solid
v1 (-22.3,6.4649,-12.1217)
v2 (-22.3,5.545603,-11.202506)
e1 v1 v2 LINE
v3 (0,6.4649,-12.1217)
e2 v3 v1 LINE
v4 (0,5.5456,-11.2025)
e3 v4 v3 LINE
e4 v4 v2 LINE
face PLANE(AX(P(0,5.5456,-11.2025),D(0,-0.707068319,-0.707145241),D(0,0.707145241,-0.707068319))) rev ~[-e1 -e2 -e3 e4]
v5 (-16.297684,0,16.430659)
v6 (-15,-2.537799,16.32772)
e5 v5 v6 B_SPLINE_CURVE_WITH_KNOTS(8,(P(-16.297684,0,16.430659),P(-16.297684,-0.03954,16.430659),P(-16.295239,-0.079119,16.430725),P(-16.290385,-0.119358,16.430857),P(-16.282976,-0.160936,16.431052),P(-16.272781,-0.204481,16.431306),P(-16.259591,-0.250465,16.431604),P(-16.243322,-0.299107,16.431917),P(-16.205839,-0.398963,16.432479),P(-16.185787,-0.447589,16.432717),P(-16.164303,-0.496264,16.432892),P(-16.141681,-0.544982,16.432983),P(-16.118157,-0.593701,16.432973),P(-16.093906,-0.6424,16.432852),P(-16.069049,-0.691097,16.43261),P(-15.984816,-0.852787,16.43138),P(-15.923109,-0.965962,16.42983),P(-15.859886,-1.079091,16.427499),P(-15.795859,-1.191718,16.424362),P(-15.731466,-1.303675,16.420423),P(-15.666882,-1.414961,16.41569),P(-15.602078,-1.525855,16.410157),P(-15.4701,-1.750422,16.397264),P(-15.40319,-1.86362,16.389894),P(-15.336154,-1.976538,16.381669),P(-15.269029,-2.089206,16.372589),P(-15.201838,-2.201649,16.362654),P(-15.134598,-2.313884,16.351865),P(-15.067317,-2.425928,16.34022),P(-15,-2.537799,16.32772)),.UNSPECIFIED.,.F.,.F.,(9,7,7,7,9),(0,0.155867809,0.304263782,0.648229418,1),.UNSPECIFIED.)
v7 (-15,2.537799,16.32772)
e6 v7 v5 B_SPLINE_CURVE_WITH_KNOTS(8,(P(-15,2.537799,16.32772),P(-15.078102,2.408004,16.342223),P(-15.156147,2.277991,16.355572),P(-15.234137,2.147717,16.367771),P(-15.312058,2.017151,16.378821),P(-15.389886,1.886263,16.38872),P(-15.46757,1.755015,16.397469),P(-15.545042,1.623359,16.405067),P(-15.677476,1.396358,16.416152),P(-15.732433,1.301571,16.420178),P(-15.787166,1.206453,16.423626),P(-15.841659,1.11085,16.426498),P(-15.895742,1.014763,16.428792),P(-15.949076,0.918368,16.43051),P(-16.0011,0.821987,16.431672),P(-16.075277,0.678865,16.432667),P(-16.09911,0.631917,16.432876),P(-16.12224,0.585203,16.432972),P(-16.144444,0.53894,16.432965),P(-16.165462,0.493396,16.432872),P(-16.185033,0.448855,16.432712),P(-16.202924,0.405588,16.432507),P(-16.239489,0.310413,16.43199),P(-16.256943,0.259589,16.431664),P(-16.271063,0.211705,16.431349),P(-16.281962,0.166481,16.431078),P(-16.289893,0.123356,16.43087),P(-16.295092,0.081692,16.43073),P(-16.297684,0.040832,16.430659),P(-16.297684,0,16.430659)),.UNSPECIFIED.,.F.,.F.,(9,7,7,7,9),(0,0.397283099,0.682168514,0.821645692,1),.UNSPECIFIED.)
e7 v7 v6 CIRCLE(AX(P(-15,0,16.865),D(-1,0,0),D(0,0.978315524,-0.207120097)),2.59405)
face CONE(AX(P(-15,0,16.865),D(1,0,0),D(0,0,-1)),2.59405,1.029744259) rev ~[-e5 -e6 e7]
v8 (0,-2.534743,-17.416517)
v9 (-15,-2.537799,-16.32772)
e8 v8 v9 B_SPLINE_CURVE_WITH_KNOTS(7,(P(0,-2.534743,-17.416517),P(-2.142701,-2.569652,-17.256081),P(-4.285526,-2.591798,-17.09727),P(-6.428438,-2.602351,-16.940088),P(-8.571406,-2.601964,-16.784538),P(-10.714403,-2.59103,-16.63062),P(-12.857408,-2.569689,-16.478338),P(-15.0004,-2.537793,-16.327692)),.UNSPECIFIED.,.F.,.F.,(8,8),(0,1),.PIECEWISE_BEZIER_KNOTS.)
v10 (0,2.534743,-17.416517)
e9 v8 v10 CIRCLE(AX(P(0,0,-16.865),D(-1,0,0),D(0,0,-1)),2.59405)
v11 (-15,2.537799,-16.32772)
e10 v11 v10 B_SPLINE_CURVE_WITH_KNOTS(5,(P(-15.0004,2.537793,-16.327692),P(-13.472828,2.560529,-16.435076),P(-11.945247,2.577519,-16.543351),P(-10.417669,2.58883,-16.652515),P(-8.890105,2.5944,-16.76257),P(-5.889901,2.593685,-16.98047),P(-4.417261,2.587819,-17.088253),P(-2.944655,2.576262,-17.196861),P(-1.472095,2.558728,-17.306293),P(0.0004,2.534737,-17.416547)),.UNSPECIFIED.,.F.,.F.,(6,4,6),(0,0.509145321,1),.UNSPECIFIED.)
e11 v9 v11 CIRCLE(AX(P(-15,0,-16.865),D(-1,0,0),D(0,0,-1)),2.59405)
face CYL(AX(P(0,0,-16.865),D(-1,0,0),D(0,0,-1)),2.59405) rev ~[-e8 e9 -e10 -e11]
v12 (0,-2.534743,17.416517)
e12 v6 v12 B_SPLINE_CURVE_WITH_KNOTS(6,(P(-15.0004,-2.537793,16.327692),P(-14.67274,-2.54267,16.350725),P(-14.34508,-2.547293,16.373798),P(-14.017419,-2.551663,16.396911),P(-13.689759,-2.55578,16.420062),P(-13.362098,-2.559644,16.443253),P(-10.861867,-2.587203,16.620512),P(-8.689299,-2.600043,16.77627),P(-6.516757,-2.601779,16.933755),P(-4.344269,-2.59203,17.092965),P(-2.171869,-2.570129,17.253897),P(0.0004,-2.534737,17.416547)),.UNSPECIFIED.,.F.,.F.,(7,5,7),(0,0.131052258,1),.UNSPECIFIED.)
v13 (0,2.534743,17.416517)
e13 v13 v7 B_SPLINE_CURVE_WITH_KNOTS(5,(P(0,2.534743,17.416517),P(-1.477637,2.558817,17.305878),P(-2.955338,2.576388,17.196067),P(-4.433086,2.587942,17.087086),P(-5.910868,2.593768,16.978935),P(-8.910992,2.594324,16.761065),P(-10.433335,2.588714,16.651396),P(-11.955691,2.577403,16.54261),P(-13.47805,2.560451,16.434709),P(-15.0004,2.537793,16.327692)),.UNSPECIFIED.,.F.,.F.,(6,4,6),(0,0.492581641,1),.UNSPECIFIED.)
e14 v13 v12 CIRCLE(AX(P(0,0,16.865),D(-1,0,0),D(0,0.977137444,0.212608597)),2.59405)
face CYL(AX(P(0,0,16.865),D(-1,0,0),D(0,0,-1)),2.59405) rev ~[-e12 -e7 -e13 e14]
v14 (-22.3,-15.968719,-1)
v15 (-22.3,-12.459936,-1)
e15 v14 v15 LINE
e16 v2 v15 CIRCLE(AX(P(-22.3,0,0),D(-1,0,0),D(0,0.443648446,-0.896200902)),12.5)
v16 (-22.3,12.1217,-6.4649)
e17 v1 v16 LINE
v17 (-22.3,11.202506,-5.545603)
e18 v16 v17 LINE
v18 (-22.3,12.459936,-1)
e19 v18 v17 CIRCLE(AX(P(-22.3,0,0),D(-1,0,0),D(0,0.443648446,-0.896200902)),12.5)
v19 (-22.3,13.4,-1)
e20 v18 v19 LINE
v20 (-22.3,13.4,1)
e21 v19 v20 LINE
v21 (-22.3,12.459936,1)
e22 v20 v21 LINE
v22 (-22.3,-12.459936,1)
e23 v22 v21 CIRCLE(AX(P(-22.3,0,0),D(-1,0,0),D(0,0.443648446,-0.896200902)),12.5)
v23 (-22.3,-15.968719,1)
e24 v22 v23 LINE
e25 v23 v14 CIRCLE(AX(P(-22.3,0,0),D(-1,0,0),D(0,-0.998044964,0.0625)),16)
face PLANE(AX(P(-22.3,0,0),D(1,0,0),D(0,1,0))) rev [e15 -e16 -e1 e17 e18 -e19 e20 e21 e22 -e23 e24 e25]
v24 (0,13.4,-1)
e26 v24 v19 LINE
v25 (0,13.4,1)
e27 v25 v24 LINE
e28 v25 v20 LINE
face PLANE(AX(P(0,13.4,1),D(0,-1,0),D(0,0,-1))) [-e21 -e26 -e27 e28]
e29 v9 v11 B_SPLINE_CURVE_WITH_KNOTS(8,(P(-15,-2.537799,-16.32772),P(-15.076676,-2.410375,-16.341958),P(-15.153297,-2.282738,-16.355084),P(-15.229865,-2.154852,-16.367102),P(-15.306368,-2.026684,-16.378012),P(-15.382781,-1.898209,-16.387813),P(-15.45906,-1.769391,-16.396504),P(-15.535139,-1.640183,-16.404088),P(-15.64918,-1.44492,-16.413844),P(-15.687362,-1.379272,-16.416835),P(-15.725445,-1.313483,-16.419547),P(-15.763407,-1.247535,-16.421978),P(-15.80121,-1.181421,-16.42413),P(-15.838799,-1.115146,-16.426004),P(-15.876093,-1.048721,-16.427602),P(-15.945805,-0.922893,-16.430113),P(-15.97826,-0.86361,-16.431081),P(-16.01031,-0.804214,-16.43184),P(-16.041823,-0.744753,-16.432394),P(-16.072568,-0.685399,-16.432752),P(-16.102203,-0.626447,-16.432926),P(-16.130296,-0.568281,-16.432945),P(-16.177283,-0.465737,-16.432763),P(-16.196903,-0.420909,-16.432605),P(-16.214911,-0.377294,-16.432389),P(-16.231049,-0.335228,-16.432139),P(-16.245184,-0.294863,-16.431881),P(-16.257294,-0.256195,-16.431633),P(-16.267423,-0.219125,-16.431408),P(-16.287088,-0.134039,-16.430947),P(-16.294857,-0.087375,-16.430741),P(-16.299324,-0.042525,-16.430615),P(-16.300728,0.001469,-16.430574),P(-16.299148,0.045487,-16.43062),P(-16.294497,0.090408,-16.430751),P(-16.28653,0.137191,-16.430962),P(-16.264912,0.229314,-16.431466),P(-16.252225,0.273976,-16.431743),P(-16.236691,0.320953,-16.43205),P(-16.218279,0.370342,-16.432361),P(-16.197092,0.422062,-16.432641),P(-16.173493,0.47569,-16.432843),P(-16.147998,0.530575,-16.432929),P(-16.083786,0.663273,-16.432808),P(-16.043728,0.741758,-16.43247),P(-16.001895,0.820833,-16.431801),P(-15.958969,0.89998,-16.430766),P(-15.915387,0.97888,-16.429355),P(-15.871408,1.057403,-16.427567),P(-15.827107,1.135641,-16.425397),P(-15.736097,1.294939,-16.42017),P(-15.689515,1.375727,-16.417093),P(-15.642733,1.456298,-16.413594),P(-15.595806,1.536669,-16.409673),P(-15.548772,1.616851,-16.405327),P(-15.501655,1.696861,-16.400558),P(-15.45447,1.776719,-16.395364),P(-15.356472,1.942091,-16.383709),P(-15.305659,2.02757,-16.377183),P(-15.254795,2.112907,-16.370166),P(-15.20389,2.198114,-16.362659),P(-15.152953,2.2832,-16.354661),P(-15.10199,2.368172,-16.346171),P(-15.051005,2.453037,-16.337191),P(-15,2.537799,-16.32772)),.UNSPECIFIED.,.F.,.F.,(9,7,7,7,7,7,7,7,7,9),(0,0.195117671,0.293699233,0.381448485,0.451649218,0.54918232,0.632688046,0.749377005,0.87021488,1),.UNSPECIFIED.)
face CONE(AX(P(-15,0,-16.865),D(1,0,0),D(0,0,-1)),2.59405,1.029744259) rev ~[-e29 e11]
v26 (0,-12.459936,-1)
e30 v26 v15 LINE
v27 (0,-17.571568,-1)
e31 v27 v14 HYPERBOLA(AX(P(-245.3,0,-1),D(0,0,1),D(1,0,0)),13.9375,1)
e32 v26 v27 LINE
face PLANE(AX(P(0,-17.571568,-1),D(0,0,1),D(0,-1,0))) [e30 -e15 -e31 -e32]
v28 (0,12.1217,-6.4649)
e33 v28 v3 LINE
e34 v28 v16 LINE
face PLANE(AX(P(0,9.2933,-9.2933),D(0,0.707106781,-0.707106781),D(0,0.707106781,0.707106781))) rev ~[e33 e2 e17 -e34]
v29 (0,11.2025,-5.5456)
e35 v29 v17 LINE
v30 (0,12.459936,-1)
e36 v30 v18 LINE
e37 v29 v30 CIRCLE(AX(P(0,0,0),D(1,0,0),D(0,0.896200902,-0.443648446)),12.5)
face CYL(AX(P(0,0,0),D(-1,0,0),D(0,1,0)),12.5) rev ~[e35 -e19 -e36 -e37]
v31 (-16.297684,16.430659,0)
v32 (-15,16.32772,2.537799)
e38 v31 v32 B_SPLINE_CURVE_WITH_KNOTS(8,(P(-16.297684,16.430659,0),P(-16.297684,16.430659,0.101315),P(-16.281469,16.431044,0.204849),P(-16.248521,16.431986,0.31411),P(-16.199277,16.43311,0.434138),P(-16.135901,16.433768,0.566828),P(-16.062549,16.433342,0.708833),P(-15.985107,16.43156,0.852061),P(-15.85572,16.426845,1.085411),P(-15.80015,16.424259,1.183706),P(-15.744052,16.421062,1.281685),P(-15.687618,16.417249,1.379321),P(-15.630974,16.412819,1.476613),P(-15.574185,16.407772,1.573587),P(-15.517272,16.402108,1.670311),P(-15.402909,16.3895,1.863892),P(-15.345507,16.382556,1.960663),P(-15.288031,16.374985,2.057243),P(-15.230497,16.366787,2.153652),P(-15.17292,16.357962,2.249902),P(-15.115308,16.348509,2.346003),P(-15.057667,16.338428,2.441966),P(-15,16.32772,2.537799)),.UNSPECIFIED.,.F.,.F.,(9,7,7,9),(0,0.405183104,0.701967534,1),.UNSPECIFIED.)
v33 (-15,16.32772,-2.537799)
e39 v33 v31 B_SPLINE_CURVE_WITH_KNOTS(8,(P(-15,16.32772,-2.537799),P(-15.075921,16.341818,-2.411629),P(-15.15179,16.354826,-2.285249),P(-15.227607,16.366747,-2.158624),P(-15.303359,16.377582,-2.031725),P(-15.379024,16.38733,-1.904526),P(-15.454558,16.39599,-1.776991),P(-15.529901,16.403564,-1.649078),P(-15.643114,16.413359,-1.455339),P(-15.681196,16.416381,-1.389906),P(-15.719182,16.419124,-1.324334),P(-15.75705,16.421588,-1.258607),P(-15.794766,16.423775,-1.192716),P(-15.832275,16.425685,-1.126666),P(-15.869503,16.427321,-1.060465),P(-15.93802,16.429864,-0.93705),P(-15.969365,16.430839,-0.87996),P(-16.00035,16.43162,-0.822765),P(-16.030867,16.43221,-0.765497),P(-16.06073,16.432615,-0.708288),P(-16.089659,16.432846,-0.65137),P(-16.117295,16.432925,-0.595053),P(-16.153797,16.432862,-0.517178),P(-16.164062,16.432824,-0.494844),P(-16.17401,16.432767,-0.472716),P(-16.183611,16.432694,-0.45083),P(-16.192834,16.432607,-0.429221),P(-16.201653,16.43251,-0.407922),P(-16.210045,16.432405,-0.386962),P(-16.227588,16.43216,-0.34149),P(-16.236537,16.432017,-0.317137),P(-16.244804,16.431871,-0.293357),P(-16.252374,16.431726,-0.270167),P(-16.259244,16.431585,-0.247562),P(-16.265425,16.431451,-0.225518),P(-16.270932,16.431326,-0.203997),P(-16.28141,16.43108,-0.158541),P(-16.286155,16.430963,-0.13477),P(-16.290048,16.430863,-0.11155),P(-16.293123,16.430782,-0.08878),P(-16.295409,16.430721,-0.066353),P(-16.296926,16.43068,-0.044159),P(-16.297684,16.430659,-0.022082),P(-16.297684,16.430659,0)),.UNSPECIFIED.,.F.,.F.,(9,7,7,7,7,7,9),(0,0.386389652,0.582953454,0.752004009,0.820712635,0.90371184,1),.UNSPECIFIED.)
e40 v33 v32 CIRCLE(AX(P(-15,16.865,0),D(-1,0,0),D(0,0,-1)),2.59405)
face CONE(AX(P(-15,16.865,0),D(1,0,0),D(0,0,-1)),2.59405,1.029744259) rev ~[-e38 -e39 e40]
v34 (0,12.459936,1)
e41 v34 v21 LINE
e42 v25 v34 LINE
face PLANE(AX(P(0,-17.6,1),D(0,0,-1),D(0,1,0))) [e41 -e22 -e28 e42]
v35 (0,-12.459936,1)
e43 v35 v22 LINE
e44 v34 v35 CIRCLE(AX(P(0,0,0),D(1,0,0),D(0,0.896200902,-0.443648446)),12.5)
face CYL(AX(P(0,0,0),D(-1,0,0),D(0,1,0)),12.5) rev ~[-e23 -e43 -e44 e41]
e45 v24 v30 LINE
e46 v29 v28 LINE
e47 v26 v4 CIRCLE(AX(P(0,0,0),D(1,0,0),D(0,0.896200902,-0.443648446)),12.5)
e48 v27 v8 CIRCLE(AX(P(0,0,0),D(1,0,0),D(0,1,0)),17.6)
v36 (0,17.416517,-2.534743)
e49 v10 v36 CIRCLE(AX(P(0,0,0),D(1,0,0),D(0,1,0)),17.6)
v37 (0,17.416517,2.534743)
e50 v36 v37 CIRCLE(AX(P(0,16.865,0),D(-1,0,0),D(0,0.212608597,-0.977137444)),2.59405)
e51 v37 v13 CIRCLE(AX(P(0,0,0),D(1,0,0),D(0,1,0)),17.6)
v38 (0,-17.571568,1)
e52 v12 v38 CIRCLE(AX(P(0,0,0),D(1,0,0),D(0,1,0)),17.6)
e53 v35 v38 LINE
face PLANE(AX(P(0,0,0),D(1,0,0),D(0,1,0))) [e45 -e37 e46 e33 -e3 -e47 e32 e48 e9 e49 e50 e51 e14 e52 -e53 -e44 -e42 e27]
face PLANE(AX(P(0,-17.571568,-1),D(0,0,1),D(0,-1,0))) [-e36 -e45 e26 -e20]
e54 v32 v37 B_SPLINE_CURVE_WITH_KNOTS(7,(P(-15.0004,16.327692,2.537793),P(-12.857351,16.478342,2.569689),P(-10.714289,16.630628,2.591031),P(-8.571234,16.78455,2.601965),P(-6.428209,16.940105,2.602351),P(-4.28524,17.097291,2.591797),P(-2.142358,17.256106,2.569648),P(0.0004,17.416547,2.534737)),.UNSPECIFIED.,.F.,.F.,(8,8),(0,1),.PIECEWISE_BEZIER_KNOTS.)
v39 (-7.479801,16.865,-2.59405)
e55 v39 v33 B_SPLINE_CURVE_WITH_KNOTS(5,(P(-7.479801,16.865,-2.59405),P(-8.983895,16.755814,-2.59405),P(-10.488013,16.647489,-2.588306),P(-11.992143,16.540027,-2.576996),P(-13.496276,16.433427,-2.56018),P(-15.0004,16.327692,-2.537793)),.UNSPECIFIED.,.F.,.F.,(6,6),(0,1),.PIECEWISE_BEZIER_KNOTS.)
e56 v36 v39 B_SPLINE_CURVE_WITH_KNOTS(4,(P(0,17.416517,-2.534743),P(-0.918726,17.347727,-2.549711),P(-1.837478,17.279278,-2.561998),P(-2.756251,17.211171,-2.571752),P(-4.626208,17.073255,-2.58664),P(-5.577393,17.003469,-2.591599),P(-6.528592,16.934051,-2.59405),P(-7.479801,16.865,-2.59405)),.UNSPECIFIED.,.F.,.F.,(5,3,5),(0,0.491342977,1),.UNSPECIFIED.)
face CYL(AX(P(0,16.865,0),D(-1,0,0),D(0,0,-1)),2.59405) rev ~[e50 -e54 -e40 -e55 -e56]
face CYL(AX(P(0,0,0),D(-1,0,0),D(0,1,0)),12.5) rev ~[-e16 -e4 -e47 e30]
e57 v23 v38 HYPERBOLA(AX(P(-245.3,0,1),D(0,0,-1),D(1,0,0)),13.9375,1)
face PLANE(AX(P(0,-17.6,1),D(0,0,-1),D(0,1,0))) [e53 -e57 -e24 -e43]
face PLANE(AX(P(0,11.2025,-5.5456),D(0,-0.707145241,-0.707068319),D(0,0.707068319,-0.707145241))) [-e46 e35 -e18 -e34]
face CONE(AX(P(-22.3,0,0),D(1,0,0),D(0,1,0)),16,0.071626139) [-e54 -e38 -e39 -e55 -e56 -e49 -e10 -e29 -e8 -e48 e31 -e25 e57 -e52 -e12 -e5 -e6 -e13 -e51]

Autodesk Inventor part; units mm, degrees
ref_plane "YZ Plane" through (0, 0, 0) normal (1, 0, 0) x (0, 1, 0)
ref_plane "XZ Plane" through (0, 0, 0) normal (0, 1, 0) x (-1, 0, 0)
sketch "Esquisse1" plane through (0, 0, 0) normal (0, 0, 1) x (1, 0, 0)
  line L0 (-36.1898, 0) -> (37.2521, 0)
  line L1 (0, 12.5) -> (-22.3, 12.5)
  line L2 (-22.3, 12.5) -> (-22.3, 16)
  line L3 (-22.3, 16) -> (0, 17.6)
  line L4 (0, 17.6) -> (0, 12.5)
  point P0 (0, 0)
  dimension "d0" = 25
  dimension "d1" = 35.2
  dimension "d2" = 0
  dimension "d3" = 32
  dimension "d4" = 22.3
  dimension "d5" = 0
revolve "Révolution1" add sketch "Esquisse1" angle 360 about axis through (-36.1898, 0, 0) along (1, 0, 0)
sketch "Esquisse4" plane through (0, 0, 0) normal (1, 0, 0) x (0, 0, 1)
  line L0 (0, 0) -> (-39.036, -39.036)
  line L1 (0, 0) -> (-55.3193, 0)
  circle A0 centre (0, 0) radius 12.5 projected
  line L2 (-5.5456, -11.2025) -> (-6.4649, -12.1217)
  line L3 (-11.2025, -5.5456) -> (-12.1217, -6.4649)
  line L4 (-12.1217, -6.4649) -> (-6.4649, -12.1217)
  dimension "d17" = 45
  dimension "d20" = 1.3
  dimension "d21" = 1.3
  dimension "d22" = 4
  dimension "d23" = 4
extrude "Extrusion1" cut sketch "Esquisse4" against normal through all contours A0 L2 L4 L0 | L0 L4 L3 A0
sketch "Esquisse5" plane through (0, 0, 0) normal (1, 0, 0) x (0, 0, 1)
  line L0 (-1, 17.6) -> (1, 17.6)
  line L1 (1, 17.6) -> (1, -13.4)
  line L2 (1, -13.4) -> (-1, -13.4)
  line L3 (-1, -13.4) -> (-1, 17.6)
  line L4 (-1, 17.6) -> (1, -13.4) construction
  line L5 (1, 17.6) -> (-1, -13.4) construction
  arc A0 (0, -17.6) -> (0, -17.6) centre (0, 0) ccw projected
  point P0 (0, 2.1)
  dimension "d26" = 2
  dimension "d27" = 31
  dimension "d28" = 0
extrude "Extrusion2" cut sketch "Esquisse5" against normal through all contours L0 A0 L3 | L0 L1 A0 | A0 L1 L2 L3 picked at (0, -3.0667)
sketch "Esquisse6" plane through (0, 0, 0) normal (1, 0, 0) x (0, 0, -1)
  line L0 (0, 0) -> (0, 23.579)
  line L1 (0, 0) -> (-21.6871, 0)
  line L2 (0, 0) -> (25.1017, 0)
  circle A0 centre (0, 0) radius 16.865
  point P0 (0, 16.865)
  point P1 (16.865, 0)
  point P2 (-16.865, 0)
  dimension "d39" = 33.73
hole "Perçage2" at (0, 16.865, 0) at (0, 0, -16.865) at (0, 0, 16.865) direction (-1, 0, 0) diameter 5.1881 depth 15 tip angle 118 thread size "M6x0.75" class "6H" standard "ANSI Metric M Profile"
properties part number "Douille1008"
